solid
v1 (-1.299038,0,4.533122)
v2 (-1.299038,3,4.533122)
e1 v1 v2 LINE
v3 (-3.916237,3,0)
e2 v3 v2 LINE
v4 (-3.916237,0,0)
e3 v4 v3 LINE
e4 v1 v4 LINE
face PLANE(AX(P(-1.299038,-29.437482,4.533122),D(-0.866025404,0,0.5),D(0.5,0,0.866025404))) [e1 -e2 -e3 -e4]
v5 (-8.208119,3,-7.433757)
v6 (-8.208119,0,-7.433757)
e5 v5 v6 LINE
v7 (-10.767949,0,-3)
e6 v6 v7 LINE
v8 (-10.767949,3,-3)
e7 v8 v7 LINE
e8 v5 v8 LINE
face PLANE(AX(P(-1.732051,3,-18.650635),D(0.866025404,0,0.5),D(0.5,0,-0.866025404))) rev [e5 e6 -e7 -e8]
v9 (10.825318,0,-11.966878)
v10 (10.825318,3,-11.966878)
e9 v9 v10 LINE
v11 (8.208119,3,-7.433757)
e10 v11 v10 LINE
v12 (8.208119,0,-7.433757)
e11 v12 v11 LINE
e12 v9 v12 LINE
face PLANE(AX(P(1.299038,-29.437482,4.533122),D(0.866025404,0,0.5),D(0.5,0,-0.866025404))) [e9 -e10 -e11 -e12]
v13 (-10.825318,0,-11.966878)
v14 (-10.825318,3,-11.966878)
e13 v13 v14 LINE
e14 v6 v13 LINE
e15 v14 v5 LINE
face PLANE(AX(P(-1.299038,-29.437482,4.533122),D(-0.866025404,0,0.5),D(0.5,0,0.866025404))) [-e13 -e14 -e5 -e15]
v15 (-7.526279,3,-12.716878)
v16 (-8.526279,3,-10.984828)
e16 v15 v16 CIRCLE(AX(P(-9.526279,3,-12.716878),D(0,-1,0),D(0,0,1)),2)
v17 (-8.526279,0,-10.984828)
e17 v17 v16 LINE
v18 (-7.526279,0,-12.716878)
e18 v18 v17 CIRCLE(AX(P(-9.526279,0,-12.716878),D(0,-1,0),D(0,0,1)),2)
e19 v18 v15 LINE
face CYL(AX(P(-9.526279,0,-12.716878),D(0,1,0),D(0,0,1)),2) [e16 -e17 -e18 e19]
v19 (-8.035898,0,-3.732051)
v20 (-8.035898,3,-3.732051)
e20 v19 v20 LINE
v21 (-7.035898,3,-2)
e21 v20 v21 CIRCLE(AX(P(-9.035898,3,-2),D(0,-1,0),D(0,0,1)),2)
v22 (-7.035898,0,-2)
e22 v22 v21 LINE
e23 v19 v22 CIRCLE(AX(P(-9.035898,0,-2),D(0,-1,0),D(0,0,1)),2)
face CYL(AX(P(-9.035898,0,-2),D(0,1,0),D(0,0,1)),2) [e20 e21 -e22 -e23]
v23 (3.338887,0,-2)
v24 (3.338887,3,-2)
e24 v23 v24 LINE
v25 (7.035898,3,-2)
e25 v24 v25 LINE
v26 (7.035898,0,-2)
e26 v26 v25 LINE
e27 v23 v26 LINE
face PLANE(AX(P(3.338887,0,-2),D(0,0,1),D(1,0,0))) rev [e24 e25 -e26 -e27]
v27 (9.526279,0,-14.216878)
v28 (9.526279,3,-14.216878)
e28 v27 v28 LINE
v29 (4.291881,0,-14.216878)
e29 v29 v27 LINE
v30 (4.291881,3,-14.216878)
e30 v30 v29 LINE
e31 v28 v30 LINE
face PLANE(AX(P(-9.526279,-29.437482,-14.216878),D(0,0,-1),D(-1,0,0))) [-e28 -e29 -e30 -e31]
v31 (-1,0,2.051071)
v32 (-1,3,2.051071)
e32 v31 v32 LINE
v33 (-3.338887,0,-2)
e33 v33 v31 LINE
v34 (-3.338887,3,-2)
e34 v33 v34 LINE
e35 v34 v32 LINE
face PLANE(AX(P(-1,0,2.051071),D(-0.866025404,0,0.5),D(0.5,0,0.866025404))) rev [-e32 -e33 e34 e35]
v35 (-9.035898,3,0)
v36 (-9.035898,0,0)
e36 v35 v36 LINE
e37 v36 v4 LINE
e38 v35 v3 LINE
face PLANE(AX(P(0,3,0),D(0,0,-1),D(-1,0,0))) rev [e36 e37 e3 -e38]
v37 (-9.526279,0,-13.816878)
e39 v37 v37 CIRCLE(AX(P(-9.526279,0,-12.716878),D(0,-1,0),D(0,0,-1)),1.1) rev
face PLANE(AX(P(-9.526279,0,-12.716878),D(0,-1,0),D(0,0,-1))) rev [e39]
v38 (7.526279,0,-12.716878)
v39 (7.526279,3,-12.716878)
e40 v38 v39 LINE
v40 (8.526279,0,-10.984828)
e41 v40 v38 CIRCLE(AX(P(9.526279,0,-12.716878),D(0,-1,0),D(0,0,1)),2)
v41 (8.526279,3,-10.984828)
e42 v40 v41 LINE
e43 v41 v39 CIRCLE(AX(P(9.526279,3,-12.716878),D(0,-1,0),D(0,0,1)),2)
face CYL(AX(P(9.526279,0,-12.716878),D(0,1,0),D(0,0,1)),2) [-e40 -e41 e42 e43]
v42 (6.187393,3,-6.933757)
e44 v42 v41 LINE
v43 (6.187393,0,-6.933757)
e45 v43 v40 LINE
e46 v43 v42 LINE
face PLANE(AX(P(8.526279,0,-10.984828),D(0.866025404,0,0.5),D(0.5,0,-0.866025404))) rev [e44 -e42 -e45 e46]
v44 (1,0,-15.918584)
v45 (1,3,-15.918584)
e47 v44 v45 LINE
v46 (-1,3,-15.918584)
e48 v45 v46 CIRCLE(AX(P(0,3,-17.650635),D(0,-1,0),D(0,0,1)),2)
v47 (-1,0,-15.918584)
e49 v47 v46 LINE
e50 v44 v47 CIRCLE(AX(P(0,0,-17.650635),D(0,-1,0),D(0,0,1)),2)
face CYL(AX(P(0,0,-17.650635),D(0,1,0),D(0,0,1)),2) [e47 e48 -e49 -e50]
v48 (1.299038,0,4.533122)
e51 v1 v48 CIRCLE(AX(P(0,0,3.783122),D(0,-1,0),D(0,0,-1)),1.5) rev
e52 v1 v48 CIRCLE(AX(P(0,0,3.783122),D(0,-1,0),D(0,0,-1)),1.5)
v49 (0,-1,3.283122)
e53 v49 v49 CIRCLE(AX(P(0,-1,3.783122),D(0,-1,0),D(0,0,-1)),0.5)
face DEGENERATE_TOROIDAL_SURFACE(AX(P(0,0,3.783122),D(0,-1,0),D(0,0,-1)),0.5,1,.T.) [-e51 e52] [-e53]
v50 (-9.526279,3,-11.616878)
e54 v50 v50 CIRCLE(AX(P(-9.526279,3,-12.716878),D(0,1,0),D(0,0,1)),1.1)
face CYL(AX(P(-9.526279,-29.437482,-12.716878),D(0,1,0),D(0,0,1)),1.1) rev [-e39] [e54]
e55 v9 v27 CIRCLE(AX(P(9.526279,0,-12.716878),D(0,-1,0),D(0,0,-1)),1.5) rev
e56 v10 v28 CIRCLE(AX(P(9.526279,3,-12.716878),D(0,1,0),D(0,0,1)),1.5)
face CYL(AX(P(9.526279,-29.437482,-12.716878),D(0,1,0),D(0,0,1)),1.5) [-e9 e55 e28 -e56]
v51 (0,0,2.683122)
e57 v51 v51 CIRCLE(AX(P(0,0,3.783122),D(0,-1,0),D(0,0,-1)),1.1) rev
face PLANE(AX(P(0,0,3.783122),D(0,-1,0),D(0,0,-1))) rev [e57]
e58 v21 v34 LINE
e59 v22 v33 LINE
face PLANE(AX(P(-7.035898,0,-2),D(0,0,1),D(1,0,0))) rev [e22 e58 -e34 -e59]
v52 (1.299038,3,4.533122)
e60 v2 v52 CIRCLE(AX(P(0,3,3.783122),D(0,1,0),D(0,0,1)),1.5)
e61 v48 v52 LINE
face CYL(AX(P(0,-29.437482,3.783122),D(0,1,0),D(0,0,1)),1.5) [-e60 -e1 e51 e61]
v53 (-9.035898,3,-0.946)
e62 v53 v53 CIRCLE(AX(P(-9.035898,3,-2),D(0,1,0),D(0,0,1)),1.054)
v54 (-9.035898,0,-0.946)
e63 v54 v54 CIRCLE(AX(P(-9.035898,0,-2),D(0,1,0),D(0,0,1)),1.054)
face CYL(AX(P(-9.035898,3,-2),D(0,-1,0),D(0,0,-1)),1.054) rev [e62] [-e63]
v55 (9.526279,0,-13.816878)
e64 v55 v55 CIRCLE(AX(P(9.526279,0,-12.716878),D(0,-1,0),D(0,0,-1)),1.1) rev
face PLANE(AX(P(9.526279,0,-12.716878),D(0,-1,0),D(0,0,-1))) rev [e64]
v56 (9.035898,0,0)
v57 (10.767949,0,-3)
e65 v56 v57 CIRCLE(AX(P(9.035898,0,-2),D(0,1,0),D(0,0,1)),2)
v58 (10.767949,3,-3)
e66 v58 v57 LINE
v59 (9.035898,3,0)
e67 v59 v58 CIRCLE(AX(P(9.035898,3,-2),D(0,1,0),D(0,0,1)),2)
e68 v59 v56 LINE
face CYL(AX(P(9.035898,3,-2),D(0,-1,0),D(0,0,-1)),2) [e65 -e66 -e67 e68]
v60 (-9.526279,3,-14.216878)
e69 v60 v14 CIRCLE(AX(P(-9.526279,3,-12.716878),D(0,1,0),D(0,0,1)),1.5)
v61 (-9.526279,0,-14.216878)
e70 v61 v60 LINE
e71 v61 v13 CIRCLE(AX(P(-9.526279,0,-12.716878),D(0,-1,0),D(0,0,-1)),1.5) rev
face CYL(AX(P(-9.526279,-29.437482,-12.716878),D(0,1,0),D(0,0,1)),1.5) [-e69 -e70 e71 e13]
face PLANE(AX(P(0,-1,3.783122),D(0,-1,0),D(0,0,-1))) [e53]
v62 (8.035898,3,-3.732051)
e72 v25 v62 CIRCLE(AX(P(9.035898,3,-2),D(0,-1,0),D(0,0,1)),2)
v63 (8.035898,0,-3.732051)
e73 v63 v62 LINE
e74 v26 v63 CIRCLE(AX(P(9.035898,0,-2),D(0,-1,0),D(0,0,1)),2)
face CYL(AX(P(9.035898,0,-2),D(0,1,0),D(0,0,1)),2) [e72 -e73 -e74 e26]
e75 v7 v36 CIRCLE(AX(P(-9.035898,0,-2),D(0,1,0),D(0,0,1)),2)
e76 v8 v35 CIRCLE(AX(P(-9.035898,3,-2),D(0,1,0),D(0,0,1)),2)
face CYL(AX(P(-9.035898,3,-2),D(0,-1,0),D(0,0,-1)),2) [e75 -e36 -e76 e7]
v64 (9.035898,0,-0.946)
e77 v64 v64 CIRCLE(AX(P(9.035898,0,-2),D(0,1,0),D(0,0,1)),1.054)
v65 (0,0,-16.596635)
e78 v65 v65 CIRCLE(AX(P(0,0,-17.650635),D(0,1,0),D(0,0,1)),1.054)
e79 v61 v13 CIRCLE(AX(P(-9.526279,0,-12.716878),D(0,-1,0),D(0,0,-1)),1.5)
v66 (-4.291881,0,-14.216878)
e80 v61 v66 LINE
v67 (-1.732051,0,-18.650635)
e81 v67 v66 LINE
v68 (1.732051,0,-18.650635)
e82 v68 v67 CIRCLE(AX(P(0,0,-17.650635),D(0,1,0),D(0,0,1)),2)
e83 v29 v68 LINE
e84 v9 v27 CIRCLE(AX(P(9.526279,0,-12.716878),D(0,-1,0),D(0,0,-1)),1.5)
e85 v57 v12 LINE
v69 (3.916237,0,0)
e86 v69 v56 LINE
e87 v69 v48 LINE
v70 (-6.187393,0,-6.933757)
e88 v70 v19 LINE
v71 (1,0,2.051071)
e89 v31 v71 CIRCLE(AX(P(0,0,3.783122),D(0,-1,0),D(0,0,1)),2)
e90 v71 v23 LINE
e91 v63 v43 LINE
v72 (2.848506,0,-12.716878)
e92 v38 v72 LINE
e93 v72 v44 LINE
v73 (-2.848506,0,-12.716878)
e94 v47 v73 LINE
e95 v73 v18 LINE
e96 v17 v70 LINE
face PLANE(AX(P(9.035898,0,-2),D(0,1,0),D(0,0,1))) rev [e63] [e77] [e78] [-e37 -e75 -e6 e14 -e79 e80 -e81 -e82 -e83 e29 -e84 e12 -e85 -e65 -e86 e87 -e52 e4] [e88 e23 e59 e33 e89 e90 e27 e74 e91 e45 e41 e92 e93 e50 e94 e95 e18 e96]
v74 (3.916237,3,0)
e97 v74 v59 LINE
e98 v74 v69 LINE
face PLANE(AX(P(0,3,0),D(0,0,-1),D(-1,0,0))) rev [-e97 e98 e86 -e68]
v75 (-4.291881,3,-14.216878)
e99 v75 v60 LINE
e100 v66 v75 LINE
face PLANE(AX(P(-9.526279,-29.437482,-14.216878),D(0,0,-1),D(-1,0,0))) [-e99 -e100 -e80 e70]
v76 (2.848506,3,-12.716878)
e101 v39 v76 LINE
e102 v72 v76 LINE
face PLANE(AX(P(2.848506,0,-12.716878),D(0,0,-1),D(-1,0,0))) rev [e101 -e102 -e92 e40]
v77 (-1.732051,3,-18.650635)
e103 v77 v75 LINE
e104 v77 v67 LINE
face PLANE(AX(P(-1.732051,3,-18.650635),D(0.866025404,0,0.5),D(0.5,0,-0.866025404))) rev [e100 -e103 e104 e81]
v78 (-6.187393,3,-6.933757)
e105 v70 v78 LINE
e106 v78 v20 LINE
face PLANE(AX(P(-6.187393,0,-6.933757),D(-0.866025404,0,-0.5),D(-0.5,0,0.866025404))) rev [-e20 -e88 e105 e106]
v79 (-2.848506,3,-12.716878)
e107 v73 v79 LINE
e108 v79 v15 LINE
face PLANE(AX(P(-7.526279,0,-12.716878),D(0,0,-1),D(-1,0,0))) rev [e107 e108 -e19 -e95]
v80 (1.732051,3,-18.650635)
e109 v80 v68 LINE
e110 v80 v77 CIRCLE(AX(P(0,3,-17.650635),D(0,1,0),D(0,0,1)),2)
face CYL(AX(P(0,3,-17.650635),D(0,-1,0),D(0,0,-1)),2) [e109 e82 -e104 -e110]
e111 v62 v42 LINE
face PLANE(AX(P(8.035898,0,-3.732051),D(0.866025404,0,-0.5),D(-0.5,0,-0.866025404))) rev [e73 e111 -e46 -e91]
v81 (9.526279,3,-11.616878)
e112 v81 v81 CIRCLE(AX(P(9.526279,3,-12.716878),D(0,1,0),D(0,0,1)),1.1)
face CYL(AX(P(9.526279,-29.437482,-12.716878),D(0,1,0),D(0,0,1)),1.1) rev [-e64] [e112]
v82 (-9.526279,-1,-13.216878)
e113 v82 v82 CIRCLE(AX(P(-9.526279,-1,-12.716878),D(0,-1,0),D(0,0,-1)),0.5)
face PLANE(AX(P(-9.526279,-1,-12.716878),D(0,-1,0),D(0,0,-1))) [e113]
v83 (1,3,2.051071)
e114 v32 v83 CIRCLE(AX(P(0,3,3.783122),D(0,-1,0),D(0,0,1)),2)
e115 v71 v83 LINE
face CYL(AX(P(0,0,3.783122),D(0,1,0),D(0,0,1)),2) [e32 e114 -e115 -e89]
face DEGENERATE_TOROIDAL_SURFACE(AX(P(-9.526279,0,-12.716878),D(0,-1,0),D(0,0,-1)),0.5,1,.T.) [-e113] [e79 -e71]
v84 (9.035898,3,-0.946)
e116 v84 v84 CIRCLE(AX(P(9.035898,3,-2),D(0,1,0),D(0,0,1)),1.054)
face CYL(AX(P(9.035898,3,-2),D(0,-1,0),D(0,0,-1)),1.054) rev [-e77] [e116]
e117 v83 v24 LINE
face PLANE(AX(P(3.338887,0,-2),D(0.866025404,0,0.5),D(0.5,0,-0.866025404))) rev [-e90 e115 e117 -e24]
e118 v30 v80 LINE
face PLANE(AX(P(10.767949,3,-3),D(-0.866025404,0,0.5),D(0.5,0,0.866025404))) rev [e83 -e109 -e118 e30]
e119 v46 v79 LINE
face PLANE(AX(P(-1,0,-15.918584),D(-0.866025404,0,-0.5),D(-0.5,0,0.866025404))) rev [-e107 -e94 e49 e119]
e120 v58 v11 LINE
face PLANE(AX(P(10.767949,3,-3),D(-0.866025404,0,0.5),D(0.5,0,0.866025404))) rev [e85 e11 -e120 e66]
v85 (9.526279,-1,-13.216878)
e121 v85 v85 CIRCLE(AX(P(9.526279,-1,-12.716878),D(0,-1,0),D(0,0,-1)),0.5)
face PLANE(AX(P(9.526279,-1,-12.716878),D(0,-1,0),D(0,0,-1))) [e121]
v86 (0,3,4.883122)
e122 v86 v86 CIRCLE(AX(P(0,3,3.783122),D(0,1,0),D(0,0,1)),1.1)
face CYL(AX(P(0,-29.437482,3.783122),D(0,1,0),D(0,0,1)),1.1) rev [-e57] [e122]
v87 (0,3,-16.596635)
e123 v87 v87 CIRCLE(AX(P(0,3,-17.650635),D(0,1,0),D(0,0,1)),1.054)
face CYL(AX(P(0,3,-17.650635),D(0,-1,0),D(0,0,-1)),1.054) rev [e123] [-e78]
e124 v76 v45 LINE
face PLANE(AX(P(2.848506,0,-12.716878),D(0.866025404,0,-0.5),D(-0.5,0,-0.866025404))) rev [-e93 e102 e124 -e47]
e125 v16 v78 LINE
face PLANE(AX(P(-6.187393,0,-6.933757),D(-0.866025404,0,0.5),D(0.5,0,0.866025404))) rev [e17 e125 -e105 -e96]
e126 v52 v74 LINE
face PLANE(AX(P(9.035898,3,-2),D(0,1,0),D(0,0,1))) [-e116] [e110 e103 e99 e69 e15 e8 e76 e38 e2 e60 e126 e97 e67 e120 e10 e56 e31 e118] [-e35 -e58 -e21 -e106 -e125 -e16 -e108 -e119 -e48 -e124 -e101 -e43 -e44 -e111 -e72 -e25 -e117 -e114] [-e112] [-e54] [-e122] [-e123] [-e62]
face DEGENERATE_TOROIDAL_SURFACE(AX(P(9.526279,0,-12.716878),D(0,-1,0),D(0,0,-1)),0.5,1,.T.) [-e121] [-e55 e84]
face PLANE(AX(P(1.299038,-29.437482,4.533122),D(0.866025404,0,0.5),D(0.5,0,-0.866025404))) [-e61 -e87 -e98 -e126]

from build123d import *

# Parameters (mm, degrees)
SKETCH1_R           = 1.054
BOSS_EXTRUDE1_DEPTH = 3
SKETCH3_R           = 1.1
BOSS_EXTRUDE2_DEPTH = 3
CUT_EXTRUDE1_DEPTH  = 23.736281859
SKETCH4_R           = 1.5
BOSS_EXTRUDE3_DEPTH = 1
FILLET1_R           = 1


with BuildPart() as part:
    # Sketch1 → Boss-Extrude1 (new body)
    with BuildSketch(Plane(origin=(0, 0, 0), x_dir=(1, 0, 0), z_dir=(0, 1, 0))):
        with BuildLine():
            Line((0, 0), (9.035898385, 0))
            ThreePointArc((9.035898385, 0), (10.767949192, 1), (10.767949192, 3))
            Line((10.767949192, 3), (1.732050808, 18.650635095))
            ThreePointArc((1.732050808, 18.650635095), (0, 19.650635095), (-1.732050808, 18.650635095))
            Line((-1.732050808, 18.650635095), (-10.767949192, 3))
            ThreePointArc((-10.767949192, 3), (-10.767949192, 1), (-9.035898385, 0))
            Line((-9.035898385, 0), (0, 0))
        make_face()
        with Locations(Location((0, 17.650635095, 0), (0, 0, 270))):
            Circle(SKETCH1_R, mode=Mode.SUBTRACT)
        with Locations(Location((-9.035898385, 2, 0), (0, 0, 270))):
            Circle(SKETCH1_R, mode=Mode.SUBTRACT)
        with Locations(Location((9.035898385, 2, 0), (0, 0, 270))):
            Circle(SKETCH1_R, mode=Mode.SUBTRACT)
    extrude(amount=BOSS_EXTRUDE1_DEPTH)

    # Sketch3 → Boss-Extrude2 (add)
    with BuildSketch(Plane(origin=(0, 3, 0), x_dir=(1, 0, 0), z_dir=(0, 1, 0))):
        with BuildLine():
            Line((-9.526279442, 14.216878365), (9.526279442, 14.216878365))
            ThreePointArc((9.526279442, 14.216878365), (10.825317547, 13.466878365), (10.825317547, 11.966878365))
            Line((10.825317547, 11.966878365), (1.299038106, -4.533121635))
            ThreePointArc((1.299038106, -4.533121635), (0, -5.283121635), (-1.299038106, -4.533121635))
            Line((-1.299038106, -4.533121635), (-10.825317547, 11.966878365))
            ThreePointArc((-10.825317547, 11.966878365), (-10.825317547, 13.466878365), (-9.526279442, 14.216878365))
        make_face()
        with Locations(Location((0, -3.783121635, 0), (0, 0, 270))):
            Circle(SKETCH3_R, mode=Mode.SUBTRACT)
        with Locations(Location((-9.526279442, 12.716878365, 0), (0, 0, 270))):
            Circle(SKETCH3_R, mode=Mode.SUBTRACT)
        with Locations(Location((9.526279442, 12.716878365, 0), (0, 0, 270))):
            Circle(SKETCH3_R, mode=Mode.SUBTRACT)
    extrude(amount=-BOSS_EXTRUDE2_DEPTH)

    # Sketch2 → Cut-Extrude1 (cut, through all)
    with BuildSketch(Plane(origin=(0, 3, 0), x_dir=(1, 0, 0), z_dir=(0, 1, 0))):
        with BuildLine():
            Line((-1, 15.918584287), (-2.848505776, 12.716878365))
            Line((-2.848505776, 12.716878365), (-7.526279442, 12.716878365))
            ThreePointArc((-7.526279442, 12.716878365), (-7.794228634, 11.716878365), (-8.526279442, 10.984827557))
            Line((-8.526279442, 10.984827557), (-6.187392609, 6.93375673))
            Line((-6.187392609, 6.93375673), (-8.035898385, 3.732050808))
            ThreePointArc((-8.035898385, 3.732050808), (-7.303847577, 3), (-7.035898385, 2))
            Line((-7.035898385, 2), (-3.338886833, 2))
            Line((-3.338886833, 2), (-1, -2.051070828))
            ThreePointArc((-1, -2.051070828), (0, -1.783121635), (1, -2.051070828))
            Line((1, -2.051070828), (3.338886833, 2))
            Line((3.338886833, 2), (7.035898385, 2))
            ThreePointArc((7.035898385, 2), (7.303847577, 3), (8.035898385, 3.732050808))
            Line((8.035898385, 3.732050808), (6.187392609, 6.93375673))
            Line((6.187392609, 6.93375673), (8.526279442, 10.984827557))
            ThreePointArc((8.526279442, 10.984827557), (7.794228634, 11.716878365), (7.526279442, 12.716878365))
            Line((7.526279442, 12.716878365), (2.848505776, 12.716878365))
            Line((2.848505776, 12.716878365), (1, 15.918584287))
            ThreePointArc((1, 15.918584287), (0, 15.650635095), (-1, 15.918584287))
        make_face()
    extrude(amount=-CUT_EXTRUDE1_DEPTH, mode=Mode.SUBTRACT)

    # Sketch4 → Boss-Extrude3 (add)
    with BuildSketch(Plane.XZ):
        with Locations(Location((0, 3.783121635, 0), (0, 0, 30))):
            Circle(SKETCH4_R)
        with Locations(Location((9.526279442, -12.716878365, 0), (0, 0, 270))):
            Circle(SKETCH4_R)
        with Locations(Location((-9.526279442, -12.716878365, 0), (0, 0, 270))):
            Circle(SKETCH4_R)
    extrude(amount=BOSS_EXTRUDE3_DEPTH)

    # Fillet1
    fillet1_edges = [part.edges().sort_by_distance(p)[0] for p in [
        (-1.299038106, -1, 3.033121635),
        (9.526279442, -1, -11.216878365),
        (-9.526279442, -1, -11.216878365),
    ]]
    fillet(fillet1_edges, radius=FILLET1_R - 0.0001)  # a hair under: the kernel refuses the full size


solid = part.part
